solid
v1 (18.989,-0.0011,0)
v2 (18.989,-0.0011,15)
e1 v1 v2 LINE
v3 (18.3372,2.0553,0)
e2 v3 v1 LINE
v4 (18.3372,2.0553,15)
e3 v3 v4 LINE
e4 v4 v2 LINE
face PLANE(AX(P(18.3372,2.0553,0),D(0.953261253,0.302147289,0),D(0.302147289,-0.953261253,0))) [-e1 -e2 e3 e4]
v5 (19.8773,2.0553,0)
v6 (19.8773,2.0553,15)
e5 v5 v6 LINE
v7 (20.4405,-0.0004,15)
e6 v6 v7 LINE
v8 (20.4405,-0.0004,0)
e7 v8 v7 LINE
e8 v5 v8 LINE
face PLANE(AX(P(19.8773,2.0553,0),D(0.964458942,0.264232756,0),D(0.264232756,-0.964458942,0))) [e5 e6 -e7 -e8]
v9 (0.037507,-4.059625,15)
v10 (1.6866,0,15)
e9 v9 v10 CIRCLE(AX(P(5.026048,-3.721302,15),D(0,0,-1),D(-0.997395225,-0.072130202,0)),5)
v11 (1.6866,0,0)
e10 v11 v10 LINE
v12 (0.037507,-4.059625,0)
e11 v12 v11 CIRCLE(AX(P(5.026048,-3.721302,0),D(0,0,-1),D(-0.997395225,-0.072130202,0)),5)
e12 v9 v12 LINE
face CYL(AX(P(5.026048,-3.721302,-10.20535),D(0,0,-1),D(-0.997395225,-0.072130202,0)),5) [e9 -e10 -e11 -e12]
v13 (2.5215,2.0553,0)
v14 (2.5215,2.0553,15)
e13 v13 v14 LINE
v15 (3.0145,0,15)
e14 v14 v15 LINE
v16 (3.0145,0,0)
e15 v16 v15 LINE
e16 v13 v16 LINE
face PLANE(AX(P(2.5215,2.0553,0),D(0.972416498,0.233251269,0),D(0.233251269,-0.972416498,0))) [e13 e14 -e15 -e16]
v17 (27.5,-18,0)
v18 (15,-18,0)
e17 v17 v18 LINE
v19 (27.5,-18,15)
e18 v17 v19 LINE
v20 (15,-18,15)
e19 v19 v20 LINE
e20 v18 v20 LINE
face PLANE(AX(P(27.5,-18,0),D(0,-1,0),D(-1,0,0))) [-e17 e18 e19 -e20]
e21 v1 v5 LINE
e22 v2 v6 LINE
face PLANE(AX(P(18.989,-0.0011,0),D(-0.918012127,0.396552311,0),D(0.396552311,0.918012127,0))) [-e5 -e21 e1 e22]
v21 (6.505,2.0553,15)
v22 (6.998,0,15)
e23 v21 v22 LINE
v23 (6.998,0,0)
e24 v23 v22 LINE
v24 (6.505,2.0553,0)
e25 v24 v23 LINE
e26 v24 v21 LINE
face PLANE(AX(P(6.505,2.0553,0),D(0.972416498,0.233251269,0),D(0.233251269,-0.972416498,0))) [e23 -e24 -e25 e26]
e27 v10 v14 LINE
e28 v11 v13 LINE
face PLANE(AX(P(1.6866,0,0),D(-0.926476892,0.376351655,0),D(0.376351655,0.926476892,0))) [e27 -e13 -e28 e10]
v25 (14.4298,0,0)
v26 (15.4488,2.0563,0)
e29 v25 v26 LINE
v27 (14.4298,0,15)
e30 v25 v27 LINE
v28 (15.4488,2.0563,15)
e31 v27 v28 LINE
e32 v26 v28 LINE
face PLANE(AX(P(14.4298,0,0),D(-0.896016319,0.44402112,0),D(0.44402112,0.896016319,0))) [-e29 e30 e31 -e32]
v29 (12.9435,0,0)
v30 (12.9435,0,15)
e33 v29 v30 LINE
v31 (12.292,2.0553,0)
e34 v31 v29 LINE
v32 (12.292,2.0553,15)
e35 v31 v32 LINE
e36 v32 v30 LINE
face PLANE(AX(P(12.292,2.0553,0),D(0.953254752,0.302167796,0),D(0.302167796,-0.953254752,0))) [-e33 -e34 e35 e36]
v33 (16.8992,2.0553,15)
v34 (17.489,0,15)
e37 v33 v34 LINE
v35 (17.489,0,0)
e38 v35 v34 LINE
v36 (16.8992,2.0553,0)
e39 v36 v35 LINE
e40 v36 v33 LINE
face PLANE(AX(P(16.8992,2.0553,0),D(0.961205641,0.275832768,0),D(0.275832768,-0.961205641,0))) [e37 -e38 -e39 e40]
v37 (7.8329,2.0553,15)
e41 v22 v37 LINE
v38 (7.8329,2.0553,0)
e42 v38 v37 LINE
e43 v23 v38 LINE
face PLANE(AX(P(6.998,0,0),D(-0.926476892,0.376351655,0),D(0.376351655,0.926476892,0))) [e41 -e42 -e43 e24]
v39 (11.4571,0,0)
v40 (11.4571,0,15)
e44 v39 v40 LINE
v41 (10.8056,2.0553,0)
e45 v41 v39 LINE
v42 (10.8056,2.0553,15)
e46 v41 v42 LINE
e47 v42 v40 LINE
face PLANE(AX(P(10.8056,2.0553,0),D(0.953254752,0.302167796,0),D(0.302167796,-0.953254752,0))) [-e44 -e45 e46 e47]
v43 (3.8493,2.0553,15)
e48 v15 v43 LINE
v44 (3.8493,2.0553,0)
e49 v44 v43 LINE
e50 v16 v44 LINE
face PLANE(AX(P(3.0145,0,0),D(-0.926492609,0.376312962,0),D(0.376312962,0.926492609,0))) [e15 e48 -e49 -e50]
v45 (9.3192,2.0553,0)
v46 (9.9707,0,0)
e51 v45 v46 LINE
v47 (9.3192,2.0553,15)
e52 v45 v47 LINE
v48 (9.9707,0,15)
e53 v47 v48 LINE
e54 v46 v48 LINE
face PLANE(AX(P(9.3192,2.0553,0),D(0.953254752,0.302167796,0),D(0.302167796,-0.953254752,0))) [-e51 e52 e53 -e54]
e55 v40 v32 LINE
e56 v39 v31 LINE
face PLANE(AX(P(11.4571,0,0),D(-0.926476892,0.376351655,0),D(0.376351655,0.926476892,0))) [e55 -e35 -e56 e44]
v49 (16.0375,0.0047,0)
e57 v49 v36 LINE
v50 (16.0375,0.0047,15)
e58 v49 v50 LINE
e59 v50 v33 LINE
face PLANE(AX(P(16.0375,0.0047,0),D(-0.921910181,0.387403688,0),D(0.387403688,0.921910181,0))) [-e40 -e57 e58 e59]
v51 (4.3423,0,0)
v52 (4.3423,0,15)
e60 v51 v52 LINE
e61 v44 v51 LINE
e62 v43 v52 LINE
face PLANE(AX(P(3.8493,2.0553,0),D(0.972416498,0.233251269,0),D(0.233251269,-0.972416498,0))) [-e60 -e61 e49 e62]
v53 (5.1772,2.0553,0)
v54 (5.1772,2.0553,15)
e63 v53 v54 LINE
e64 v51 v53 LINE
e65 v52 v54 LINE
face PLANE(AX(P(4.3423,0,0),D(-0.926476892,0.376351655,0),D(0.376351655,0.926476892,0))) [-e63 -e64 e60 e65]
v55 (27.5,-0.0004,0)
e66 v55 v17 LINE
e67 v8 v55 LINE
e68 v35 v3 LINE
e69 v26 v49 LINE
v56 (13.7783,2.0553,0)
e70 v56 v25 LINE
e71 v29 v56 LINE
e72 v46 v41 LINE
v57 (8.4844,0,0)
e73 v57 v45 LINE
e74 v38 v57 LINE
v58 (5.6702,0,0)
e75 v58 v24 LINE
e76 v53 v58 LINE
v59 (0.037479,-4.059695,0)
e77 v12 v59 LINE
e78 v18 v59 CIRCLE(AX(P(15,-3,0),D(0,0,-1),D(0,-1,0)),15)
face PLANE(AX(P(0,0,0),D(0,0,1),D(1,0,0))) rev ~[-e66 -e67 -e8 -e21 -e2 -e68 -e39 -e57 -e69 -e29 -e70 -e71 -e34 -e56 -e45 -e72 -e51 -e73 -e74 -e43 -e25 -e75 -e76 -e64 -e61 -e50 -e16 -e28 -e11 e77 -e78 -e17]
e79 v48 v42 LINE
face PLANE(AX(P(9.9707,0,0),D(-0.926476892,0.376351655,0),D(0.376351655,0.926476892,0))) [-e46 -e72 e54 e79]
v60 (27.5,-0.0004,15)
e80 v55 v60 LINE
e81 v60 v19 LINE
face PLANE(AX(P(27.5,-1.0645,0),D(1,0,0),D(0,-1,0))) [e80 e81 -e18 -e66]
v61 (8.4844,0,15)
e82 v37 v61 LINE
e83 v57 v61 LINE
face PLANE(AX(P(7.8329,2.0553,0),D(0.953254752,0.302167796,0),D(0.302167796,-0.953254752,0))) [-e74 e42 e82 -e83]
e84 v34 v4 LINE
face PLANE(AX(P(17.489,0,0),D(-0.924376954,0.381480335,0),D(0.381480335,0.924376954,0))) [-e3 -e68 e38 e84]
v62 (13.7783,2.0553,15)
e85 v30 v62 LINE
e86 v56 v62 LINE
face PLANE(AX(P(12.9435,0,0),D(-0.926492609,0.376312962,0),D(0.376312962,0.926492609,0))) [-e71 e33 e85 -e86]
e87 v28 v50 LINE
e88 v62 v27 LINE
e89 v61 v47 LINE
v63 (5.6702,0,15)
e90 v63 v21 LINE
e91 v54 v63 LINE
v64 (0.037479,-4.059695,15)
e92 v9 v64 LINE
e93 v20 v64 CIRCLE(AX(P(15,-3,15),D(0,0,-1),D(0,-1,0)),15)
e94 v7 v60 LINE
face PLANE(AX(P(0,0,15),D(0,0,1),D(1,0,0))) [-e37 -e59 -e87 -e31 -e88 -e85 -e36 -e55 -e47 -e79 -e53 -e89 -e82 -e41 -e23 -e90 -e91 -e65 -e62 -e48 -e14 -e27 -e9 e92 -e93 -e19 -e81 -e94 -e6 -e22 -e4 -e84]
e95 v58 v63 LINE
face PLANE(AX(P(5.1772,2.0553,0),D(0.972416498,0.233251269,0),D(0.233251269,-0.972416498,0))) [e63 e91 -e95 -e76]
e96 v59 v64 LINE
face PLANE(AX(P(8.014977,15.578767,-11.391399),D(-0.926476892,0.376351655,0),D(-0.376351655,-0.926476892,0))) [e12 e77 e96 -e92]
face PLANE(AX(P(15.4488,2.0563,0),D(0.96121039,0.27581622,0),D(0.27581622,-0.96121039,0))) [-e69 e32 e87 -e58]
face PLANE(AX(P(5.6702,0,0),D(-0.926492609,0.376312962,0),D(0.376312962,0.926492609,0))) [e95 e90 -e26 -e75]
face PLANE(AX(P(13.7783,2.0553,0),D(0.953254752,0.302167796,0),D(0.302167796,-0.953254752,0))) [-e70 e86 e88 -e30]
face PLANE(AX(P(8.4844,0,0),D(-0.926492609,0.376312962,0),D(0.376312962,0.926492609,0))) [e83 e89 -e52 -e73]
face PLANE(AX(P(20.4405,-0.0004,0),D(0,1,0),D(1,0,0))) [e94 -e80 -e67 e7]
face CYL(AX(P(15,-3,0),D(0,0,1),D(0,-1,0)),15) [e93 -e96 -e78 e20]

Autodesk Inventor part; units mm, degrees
ref_plane "YZ Plane" through (0, 0, 0) normal (1, 0, 0) x (0, 1, 0)
ref_plane "XZ Plane" through (0, 0, 0) normal (0, 1, 0) x (-1, 0, 0)
ref_plane "XY Plane" through (0, 0, 0) normal (0, 0, 1) x (1, 0, 0)
sketch "Sketch5" plane through (0, 0, 0) normal (0, 0, 1) x (1, 0, 0)
  line L0 (27.5, -18) -> (0, -18)
  line L1 (0, -18) -> (0, 0)
  line L2 (27.5, -1.0645) -> (27.5, -18)
  line L3 (1.6866, 0) -> (2.5215, 2.0553)
  line L4 (2.5215, 2.0553) -> (3.0145, 0)
  line L5 (3.0145, 0) -> (3.8493, 2.0553)
  line L6 (3.8493, 2.0553) -> (4.3423, 0)
  line L7 (4.3423, 0) -> (5.1772, 2.0553)
  line L8 (5.1772, 2.0553) -> (5.6702, 0)
  line L9 (5.6702, 0) -> (6.505, 2.0553)
  line L10 (6.505, 2.0553) -> (6.998, 0)
  line L11 (6.998, 0) -> (7.8329, 2.0553)
  line L12 (7.8329, 2.0553) -> (8.4844, 0)
  line L13 (8.4844, 0) -> (9.3192, 2.0553)
  line L14 (9.3192, 2.0553) -> (9.9707, 0)
  line L15 (9.9707, 0) -> (10.8056, 2.0553)
  line L16 (10.8056, 2.0553) -> (11.4571, 0)
  line L17 (11.4571, 0) -> (12.292, 2.0553)
  line L18 (12.292, 2.0553) -> (12.9435, 0)
  line L19 (12.9435, 0) -> (13.7783, 2.0553)
  line L20 (13.7783, 2.0553) -> (14.4298, 0)
  line L21 (14.4298, 0) -> (15.4488, 2.0563)
  line L22 (15.4488, 2.0563) -> (16.0375, 0.0047)
  line L23 (16.0375, 0.0047) -> (16.8992, 2.0553)
  line L24 (16.8992, 2.0553) -> (17.489, 0)
  line L25 (0, 0) -> (1.6866, 0)
  line L26 (0, 0) -> (1.6866, 0)
  line L27 (17.489, 0) -> (18.3372, 2.0553)
  line L28 (18.3372, 2.0553) -> (18.989, -0.0011)
  line L29 (27.5, -0.0004) -> (27.5, -1.0645)
  line L30 (18.989, -0.0011) -> (19.8773, 2.0553)
  line L31 (19.8773, 2.0553) -> (20.4405, -0.0004)
  line L32 (15.4483, 2.0553) -> (15.4491, 2.0553)
  line L33 (18.9887, 0) -> (18.9895, 0)
  line L34 (20.4405, -0.0004) -> (27.5, -0.0004)
  point P0 (20.4491, -0.0317)
  dimension "d97" = 18
  dimension "d106" = 27.5
extrude "Extrusion2" add sketch "Sketch5" along normal blind 15
fillet "Fillet2" radius 15 1 edges at (0, -18, 7.5)
fillet "Rundung3" radius 5 1 edges at (0, 0, 7.5)
equation "\"l1\" = 8"
properties part number "Maria_Greifer_3D-Druck"
